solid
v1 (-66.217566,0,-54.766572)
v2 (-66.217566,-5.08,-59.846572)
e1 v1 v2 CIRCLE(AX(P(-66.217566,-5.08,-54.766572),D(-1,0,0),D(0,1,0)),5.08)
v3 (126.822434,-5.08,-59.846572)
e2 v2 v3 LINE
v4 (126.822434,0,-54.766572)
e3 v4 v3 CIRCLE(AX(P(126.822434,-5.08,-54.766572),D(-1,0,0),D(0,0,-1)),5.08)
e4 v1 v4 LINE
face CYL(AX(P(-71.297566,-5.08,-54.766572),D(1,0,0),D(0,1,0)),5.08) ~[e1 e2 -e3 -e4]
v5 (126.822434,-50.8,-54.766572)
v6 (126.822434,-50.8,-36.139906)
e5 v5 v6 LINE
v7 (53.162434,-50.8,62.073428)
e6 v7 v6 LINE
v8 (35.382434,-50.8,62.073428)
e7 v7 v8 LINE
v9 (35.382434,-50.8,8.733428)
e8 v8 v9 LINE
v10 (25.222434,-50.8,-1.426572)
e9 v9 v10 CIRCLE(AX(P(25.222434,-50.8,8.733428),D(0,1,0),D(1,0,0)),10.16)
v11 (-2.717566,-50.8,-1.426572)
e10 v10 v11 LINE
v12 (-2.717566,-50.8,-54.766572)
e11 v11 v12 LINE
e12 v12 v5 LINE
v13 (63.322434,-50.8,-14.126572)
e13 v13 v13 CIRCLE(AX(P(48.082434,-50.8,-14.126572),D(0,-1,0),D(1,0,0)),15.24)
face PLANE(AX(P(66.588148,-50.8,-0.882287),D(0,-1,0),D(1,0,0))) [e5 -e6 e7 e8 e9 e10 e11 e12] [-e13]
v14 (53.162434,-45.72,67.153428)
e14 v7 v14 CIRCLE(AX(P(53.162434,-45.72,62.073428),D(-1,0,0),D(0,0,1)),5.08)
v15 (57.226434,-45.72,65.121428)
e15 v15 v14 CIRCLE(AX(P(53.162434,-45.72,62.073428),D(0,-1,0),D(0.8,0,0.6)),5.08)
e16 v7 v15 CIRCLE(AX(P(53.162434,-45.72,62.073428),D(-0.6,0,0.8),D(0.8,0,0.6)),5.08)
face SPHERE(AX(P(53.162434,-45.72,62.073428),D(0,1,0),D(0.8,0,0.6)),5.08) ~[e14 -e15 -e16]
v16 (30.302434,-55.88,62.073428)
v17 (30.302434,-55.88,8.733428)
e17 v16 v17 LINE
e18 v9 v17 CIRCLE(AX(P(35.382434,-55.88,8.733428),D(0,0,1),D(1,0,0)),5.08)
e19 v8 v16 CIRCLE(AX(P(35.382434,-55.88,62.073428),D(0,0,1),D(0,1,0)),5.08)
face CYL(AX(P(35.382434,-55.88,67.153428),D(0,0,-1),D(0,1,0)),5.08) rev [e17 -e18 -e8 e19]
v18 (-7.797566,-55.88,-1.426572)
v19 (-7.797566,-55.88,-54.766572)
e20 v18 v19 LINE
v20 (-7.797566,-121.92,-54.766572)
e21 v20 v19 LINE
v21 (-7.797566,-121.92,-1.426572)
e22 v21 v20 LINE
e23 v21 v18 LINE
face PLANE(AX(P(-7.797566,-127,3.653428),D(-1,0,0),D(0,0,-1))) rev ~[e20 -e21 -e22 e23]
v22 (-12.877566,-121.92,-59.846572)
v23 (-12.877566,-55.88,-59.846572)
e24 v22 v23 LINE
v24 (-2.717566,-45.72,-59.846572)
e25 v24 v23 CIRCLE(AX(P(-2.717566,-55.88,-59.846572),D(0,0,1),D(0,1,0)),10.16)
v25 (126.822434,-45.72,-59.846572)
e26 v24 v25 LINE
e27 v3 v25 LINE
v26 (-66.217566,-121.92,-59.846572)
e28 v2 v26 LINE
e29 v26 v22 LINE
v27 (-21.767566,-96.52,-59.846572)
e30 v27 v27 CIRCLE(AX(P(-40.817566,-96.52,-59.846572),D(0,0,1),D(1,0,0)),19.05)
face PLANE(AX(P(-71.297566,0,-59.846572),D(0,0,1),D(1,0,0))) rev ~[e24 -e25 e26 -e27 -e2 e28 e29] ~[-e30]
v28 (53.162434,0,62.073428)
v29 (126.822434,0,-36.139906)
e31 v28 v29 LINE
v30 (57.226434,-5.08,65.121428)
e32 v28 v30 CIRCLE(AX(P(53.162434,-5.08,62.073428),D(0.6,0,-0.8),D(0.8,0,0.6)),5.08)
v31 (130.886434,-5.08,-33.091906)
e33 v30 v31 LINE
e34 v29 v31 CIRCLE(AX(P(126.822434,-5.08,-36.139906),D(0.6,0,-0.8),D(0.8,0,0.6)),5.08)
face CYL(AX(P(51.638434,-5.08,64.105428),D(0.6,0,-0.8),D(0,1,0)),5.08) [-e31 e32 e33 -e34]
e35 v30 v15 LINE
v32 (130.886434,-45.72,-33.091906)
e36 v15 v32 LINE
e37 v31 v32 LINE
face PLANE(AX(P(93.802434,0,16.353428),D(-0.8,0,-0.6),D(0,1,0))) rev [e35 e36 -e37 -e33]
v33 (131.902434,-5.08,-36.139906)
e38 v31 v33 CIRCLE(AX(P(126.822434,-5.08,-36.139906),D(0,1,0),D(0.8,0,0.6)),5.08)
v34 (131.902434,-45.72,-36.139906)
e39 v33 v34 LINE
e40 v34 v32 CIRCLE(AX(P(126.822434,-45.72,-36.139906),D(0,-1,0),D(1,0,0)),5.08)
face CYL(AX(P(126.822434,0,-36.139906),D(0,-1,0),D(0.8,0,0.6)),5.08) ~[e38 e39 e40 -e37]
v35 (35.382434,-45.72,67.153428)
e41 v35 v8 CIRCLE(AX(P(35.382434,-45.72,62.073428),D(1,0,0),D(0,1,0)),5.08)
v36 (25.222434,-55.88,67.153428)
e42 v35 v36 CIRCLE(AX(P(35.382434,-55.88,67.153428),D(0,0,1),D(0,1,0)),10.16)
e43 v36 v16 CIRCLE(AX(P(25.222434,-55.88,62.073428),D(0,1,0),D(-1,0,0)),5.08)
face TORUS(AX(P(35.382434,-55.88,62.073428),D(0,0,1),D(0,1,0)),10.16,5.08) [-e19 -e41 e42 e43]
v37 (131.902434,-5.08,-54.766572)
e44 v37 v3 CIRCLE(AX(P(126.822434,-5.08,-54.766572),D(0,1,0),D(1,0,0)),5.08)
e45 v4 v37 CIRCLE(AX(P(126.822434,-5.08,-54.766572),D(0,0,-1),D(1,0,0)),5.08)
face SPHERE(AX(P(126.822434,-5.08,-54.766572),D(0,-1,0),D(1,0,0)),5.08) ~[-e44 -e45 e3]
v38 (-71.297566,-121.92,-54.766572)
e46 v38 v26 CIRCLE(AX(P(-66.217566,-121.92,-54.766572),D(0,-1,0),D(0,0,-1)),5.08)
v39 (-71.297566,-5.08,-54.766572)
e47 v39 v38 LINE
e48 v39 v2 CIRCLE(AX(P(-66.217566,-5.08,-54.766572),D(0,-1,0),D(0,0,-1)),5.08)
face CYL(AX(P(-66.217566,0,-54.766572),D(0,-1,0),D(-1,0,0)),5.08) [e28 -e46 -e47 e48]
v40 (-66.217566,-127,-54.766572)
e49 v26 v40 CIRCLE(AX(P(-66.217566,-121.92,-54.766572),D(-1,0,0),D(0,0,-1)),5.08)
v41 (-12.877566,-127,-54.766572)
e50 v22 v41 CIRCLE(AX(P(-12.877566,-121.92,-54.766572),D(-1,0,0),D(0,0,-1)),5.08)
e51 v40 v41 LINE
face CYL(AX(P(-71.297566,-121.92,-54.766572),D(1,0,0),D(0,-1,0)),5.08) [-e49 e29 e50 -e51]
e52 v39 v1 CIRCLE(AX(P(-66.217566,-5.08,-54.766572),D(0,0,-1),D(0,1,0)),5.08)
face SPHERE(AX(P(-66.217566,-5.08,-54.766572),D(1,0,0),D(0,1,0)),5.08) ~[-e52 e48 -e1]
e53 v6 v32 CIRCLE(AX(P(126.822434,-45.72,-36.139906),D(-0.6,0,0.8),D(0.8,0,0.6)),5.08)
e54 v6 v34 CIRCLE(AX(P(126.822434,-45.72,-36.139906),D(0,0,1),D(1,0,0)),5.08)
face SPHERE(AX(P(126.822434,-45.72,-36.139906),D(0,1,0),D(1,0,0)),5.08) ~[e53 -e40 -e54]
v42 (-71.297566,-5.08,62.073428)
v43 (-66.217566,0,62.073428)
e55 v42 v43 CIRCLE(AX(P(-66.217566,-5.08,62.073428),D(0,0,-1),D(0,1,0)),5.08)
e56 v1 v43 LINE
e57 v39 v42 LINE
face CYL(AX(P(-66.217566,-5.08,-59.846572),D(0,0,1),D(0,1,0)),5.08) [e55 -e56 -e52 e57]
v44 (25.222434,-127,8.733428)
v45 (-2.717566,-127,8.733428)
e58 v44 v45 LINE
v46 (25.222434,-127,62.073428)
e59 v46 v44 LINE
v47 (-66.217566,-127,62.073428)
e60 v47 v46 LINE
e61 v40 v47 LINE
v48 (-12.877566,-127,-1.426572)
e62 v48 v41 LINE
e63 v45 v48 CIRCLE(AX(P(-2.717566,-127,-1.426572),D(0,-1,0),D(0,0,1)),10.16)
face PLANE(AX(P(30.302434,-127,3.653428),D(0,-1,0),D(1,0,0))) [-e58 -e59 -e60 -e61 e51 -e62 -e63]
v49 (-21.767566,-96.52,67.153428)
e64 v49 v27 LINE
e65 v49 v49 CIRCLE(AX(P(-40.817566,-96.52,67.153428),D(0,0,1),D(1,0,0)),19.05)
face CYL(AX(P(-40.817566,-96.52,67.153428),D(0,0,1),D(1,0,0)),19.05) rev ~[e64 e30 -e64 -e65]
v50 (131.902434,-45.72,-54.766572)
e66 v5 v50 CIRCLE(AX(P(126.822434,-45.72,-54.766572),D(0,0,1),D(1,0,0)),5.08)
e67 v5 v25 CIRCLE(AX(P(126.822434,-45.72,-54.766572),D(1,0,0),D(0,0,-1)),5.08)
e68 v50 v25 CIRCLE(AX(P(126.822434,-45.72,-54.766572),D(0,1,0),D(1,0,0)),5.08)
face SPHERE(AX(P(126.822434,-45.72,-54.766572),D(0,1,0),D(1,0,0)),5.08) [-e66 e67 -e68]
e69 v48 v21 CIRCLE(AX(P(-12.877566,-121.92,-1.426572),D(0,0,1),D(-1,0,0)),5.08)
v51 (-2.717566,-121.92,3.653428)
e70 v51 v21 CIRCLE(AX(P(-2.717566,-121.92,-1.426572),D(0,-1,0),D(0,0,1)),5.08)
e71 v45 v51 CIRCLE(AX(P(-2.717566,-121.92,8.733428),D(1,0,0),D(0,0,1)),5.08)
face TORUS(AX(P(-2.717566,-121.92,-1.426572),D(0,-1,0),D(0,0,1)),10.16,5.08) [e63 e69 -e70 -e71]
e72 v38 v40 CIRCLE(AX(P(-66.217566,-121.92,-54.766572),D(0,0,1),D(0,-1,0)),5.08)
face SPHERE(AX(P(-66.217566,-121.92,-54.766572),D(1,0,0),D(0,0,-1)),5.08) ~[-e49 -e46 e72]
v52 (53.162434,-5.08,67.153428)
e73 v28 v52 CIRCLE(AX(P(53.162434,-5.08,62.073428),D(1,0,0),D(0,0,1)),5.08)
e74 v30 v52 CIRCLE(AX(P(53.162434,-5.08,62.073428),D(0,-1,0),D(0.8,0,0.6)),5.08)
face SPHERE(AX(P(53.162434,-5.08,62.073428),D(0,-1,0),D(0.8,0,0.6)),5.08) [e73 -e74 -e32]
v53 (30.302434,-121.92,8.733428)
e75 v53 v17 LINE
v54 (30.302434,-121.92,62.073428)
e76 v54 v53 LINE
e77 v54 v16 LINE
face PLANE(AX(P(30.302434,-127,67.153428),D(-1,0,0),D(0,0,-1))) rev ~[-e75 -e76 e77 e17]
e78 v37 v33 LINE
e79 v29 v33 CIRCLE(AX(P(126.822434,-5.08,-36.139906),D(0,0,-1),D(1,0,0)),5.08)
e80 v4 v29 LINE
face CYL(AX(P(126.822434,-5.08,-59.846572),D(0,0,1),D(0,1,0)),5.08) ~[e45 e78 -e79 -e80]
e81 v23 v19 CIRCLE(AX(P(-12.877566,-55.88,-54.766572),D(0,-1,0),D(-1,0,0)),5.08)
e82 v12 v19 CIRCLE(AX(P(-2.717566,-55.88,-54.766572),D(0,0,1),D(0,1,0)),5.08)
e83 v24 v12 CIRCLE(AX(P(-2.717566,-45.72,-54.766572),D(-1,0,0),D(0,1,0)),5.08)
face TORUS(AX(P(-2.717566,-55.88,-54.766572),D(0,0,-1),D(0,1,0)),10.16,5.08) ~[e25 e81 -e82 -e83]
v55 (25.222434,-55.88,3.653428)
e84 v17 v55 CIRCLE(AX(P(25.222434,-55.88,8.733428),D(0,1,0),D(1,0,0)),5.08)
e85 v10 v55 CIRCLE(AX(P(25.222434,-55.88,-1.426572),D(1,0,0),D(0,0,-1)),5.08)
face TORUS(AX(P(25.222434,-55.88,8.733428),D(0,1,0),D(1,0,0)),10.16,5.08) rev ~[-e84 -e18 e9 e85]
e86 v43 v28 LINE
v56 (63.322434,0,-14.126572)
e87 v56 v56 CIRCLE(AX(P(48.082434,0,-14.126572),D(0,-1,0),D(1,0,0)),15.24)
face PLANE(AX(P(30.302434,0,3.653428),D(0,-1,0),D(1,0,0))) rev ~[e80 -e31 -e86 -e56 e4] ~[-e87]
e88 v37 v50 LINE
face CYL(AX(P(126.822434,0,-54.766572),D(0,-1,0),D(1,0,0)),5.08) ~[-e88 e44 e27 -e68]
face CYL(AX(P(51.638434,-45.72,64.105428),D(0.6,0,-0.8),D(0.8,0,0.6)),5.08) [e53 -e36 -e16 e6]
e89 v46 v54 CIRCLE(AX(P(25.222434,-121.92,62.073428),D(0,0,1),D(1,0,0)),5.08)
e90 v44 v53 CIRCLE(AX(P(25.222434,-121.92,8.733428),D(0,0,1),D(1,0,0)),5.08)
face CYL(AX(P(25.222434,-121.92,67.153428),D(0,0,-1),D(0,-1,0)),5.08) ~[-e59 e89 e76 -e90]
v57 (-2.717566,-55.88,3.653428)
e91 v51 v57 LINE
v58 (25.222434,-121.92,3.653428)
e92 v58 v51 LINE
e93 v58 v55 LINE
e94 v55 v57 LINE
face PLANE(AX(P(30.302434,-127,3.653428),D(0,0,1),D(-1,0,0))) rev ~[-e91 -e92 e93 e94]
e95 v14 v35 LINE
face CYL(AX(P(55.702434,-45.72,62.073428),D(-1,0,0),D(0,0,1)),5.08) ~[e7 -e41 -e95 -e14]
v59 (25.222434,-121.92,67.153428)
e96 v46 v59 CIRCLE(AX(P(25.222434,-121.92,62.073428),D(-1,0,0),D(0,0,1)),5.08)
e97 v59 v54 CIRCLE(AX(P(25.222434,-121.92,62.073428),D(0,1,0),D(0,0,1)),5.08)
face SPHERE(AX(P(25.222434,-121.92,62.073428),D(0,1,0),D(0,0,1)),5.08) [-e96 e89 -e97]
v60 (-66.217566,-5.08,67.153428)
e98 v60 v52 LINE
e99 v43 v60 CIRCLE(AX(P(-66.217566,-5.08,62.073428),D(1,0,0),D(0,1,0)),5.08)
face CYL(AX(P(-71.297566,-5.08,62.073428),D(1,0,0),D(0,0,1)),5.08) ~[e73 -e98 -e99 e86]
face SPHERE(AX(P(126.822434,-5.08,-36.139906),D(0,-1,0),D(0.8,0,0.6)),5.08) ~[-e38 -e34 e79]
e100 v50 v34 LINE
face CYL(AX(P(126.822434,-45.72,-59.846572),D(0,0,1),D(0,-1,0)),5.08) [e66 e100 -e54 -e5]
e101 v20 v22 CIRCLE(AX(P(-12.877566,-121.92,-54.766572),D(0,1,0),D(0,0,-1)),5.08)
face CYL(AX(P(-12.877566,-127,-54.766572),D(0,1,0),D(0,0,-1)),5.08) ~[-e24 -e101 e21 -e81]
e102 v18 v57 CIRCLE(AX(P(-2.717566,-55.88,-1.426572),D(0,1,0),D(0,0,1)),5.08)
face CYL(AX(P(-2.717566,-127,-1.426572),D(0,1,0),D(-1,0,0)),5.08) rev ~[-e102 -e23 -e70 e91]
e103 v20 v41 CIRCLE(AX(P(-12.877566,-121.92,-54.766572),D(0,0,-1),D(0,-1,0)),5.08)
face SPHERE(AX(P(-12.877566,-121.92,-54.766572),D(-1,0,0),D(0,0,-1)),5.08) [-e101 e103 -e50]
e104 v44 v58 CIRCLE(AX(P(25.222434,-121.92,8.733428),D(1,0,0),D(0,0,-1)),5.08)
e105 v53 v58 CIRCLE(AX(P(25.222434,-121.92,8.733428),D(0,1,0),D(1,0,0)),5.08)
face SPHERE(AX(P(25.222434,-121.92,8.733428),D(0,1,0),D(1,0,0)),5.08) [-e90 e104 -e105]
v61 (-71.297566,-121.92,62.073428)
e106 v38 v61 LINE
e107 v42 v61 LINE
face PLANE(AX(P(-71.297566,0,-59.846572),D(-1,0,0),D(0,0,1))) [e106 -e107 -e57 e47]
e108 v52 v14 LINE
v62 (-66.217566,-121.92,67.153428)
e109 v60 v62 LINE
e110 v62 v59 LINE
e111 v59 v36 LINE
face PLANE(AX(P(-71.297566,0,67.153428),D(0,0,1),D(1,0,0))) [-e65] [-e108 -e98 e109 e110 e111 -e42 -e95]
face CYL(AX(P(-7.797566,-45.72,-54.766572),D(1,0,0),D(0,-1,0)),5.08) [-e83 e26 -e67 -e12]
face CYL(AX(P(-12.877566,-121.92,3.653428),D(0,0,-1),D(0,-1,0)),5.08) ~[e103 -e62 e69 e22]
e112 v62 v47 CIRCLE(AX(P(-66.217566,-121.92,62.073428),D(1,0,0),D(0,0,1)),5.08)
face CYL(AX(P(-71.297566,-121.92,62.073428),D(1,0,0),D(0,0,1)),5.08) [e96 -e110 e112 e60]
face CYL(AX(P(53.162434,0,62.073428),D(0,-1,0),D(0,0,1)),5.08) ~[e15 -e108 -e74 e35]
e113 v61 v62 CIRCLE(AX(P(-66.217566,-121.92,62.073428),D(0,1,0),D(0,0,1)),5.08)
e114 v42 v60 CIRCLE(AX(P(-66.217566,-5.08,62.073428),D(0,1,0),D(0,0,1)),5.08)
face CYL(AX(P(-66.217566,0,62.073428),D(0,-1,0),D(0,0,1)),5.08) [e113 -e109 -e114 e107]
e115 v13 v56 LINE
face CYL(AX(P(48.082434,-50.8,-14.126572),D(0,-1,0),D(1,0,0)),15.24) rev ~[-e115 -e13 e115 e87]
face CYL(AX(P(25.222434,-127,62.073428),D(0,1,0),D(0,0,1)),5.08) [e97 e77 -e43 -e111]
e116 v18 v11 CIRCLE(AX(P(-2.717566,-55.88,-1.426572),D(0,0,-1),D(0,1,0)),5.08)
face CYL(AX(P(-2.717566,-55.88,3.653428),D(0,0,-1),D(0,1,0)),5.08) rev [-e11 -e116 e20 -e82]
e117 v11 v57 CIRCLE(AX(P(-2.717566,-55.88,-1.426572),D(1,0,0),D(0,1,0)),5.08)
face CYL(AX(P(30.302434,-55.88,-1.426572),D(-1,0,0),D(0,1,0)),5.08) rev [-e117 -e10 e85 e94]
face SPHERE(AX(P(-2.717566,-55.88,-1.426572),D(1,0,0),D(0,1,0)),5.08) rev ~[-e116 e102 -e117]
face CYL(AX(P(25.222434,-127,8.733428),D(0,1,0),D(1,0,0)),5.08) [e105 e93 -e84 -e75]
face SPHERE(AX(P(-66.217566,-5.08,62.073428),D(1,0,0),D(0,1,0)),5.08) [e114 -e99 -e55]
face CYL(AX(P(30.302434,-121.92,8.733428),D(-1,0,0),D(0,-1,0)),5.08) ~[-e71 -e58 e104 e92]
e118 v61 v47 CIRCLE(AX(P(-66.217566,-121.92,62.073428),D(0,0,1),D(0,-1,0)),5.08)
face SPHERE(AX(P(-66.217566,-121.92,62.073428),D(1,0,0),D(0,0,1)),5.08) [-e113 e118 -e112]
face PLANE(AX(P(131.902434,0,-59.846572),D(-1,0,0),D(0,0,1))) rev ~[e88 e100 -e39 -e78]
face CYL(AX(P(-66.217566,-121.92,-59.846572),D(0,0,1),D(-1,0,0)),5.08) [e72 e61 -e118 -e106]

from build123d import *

# Parameters (mm, degrees)
F0_W      = 203.2
F0_H      = 127
F1_DEPTH  = 127
F3_DEPTH  = 76.2
F4_SIZE2  = 101.6
F4_SIZE   = 76.2
F5_R      = 5.08
F7_R      = 15.24
F8_DEPTH  = 50.8
F9_R      = 19.05
F10_DEPTH = 127


# Not quite as in the source:
# - a feature of the source that left no trace in its solid (it failed there, or was rolled back) is left out


with BuildPart() as f1:
    # F0 (on Front) → F1 (new body)
    with BuildSketch(Plane.XZ):
        with Locations((30.3024339037, 3.653427586)):
            Rectangle(F0_W, F0_H)
    extrude(amount=F1_DEPTH)

    # F2 (on face) → F3 (cut)
    with BuildSketch(Plane.XZ.offset(127)):
        Polygon((-7.7975660963, 3.653427586), (-7.7975660963, -59.846572414), (131.9024339037, -59.846572414), (131.9024339037, 67.153427586), (30.3024339037, 67.153427586), (30.3024339037, 3.653427586), align=None)
    extrude(amount=-F3_DEPTH, mode=Mode.SUBTRACT)

    # F4
    f4_edges = [f1.edges().sort_by_distance(p)[0] for p in [
        (131.902434, -25.4, 67.153428),
    ]]
    f4_side = f1.faces().sort_by_distance((8.531005, -52.614286, 67.153428))[0]
    chamfer(f4_edges, length=F4_SIZE, length2=F4_SIZE2, reference=f4_side)

    # F5
    f5_edges = [f1.edges().sort_by_distance(p)[0] for p in [
        (30.302434, -88.9, 67.153428),
        (-20.497566, -127, 67.153428),
        (55.702434, -25.4, 67.153428),
        (131.902434, -25.4, -34.446572),
        (131.902434, -25.4, -59.846572),
        (-39.547566, -127, -59.846572),
        (-7.797566, -88.9, -59.846572),
        (-7.797566, -127, -28.096572),
        (30.302434, -88.9, 3.653428),
        (30.302434, -127, 35.403428),
        (30.302434, -50.8, 35.403428),
        (11.252434, -50.8, 3.653428),
        (-7.797566, -50.8, -28.096572),
        (93.802434, 0, 16.353428),
        (131.902434, 0, -47.146572),
        (-7.797566, 0, 67.153428),
        (30.302434, 0, -59.846572),
        (-71.297566, 0, 3.653428),
        (-71.297566, -63.5, 67.153428),
        (-71.297566, -63.5, -59.846572),
        (131.902434, -50.8, -47.146572),
        (93.802434, -50.8, 16.353428),
        (62.052434, -50.8, -59.846572),
        (43.002434, -50.8, 67.153428),
        (-71.297566, -127, 3.653428),
        (-7.797566, -88.9, 3.653428),
        (11.252434, -127, 3.653428),
    ]]
    fillet(f5_edges, radius=F5_R)

    # F7 (on face) → F8 (cut, through all)
    with BuildSketch(Plane.XZ.offset(50.8)):
        with Locations((48.0824339037, -14.126572414)):
            Circle(F7_R)
    extrude(amount=-F8_DEPTH, mode=Mode.SUBTRACT)

    # F9 (on face) → F10 (cut, through all)
    with BuildSketch(Plane.XY.offset(67.153427586)):
        with Locations((-40.8175660963, -96.52)):
            Circle(F9_R)
    extrude(amount=-F10_DEPTH, mode=Mode.SUBTRACT)


solid = f1.part
